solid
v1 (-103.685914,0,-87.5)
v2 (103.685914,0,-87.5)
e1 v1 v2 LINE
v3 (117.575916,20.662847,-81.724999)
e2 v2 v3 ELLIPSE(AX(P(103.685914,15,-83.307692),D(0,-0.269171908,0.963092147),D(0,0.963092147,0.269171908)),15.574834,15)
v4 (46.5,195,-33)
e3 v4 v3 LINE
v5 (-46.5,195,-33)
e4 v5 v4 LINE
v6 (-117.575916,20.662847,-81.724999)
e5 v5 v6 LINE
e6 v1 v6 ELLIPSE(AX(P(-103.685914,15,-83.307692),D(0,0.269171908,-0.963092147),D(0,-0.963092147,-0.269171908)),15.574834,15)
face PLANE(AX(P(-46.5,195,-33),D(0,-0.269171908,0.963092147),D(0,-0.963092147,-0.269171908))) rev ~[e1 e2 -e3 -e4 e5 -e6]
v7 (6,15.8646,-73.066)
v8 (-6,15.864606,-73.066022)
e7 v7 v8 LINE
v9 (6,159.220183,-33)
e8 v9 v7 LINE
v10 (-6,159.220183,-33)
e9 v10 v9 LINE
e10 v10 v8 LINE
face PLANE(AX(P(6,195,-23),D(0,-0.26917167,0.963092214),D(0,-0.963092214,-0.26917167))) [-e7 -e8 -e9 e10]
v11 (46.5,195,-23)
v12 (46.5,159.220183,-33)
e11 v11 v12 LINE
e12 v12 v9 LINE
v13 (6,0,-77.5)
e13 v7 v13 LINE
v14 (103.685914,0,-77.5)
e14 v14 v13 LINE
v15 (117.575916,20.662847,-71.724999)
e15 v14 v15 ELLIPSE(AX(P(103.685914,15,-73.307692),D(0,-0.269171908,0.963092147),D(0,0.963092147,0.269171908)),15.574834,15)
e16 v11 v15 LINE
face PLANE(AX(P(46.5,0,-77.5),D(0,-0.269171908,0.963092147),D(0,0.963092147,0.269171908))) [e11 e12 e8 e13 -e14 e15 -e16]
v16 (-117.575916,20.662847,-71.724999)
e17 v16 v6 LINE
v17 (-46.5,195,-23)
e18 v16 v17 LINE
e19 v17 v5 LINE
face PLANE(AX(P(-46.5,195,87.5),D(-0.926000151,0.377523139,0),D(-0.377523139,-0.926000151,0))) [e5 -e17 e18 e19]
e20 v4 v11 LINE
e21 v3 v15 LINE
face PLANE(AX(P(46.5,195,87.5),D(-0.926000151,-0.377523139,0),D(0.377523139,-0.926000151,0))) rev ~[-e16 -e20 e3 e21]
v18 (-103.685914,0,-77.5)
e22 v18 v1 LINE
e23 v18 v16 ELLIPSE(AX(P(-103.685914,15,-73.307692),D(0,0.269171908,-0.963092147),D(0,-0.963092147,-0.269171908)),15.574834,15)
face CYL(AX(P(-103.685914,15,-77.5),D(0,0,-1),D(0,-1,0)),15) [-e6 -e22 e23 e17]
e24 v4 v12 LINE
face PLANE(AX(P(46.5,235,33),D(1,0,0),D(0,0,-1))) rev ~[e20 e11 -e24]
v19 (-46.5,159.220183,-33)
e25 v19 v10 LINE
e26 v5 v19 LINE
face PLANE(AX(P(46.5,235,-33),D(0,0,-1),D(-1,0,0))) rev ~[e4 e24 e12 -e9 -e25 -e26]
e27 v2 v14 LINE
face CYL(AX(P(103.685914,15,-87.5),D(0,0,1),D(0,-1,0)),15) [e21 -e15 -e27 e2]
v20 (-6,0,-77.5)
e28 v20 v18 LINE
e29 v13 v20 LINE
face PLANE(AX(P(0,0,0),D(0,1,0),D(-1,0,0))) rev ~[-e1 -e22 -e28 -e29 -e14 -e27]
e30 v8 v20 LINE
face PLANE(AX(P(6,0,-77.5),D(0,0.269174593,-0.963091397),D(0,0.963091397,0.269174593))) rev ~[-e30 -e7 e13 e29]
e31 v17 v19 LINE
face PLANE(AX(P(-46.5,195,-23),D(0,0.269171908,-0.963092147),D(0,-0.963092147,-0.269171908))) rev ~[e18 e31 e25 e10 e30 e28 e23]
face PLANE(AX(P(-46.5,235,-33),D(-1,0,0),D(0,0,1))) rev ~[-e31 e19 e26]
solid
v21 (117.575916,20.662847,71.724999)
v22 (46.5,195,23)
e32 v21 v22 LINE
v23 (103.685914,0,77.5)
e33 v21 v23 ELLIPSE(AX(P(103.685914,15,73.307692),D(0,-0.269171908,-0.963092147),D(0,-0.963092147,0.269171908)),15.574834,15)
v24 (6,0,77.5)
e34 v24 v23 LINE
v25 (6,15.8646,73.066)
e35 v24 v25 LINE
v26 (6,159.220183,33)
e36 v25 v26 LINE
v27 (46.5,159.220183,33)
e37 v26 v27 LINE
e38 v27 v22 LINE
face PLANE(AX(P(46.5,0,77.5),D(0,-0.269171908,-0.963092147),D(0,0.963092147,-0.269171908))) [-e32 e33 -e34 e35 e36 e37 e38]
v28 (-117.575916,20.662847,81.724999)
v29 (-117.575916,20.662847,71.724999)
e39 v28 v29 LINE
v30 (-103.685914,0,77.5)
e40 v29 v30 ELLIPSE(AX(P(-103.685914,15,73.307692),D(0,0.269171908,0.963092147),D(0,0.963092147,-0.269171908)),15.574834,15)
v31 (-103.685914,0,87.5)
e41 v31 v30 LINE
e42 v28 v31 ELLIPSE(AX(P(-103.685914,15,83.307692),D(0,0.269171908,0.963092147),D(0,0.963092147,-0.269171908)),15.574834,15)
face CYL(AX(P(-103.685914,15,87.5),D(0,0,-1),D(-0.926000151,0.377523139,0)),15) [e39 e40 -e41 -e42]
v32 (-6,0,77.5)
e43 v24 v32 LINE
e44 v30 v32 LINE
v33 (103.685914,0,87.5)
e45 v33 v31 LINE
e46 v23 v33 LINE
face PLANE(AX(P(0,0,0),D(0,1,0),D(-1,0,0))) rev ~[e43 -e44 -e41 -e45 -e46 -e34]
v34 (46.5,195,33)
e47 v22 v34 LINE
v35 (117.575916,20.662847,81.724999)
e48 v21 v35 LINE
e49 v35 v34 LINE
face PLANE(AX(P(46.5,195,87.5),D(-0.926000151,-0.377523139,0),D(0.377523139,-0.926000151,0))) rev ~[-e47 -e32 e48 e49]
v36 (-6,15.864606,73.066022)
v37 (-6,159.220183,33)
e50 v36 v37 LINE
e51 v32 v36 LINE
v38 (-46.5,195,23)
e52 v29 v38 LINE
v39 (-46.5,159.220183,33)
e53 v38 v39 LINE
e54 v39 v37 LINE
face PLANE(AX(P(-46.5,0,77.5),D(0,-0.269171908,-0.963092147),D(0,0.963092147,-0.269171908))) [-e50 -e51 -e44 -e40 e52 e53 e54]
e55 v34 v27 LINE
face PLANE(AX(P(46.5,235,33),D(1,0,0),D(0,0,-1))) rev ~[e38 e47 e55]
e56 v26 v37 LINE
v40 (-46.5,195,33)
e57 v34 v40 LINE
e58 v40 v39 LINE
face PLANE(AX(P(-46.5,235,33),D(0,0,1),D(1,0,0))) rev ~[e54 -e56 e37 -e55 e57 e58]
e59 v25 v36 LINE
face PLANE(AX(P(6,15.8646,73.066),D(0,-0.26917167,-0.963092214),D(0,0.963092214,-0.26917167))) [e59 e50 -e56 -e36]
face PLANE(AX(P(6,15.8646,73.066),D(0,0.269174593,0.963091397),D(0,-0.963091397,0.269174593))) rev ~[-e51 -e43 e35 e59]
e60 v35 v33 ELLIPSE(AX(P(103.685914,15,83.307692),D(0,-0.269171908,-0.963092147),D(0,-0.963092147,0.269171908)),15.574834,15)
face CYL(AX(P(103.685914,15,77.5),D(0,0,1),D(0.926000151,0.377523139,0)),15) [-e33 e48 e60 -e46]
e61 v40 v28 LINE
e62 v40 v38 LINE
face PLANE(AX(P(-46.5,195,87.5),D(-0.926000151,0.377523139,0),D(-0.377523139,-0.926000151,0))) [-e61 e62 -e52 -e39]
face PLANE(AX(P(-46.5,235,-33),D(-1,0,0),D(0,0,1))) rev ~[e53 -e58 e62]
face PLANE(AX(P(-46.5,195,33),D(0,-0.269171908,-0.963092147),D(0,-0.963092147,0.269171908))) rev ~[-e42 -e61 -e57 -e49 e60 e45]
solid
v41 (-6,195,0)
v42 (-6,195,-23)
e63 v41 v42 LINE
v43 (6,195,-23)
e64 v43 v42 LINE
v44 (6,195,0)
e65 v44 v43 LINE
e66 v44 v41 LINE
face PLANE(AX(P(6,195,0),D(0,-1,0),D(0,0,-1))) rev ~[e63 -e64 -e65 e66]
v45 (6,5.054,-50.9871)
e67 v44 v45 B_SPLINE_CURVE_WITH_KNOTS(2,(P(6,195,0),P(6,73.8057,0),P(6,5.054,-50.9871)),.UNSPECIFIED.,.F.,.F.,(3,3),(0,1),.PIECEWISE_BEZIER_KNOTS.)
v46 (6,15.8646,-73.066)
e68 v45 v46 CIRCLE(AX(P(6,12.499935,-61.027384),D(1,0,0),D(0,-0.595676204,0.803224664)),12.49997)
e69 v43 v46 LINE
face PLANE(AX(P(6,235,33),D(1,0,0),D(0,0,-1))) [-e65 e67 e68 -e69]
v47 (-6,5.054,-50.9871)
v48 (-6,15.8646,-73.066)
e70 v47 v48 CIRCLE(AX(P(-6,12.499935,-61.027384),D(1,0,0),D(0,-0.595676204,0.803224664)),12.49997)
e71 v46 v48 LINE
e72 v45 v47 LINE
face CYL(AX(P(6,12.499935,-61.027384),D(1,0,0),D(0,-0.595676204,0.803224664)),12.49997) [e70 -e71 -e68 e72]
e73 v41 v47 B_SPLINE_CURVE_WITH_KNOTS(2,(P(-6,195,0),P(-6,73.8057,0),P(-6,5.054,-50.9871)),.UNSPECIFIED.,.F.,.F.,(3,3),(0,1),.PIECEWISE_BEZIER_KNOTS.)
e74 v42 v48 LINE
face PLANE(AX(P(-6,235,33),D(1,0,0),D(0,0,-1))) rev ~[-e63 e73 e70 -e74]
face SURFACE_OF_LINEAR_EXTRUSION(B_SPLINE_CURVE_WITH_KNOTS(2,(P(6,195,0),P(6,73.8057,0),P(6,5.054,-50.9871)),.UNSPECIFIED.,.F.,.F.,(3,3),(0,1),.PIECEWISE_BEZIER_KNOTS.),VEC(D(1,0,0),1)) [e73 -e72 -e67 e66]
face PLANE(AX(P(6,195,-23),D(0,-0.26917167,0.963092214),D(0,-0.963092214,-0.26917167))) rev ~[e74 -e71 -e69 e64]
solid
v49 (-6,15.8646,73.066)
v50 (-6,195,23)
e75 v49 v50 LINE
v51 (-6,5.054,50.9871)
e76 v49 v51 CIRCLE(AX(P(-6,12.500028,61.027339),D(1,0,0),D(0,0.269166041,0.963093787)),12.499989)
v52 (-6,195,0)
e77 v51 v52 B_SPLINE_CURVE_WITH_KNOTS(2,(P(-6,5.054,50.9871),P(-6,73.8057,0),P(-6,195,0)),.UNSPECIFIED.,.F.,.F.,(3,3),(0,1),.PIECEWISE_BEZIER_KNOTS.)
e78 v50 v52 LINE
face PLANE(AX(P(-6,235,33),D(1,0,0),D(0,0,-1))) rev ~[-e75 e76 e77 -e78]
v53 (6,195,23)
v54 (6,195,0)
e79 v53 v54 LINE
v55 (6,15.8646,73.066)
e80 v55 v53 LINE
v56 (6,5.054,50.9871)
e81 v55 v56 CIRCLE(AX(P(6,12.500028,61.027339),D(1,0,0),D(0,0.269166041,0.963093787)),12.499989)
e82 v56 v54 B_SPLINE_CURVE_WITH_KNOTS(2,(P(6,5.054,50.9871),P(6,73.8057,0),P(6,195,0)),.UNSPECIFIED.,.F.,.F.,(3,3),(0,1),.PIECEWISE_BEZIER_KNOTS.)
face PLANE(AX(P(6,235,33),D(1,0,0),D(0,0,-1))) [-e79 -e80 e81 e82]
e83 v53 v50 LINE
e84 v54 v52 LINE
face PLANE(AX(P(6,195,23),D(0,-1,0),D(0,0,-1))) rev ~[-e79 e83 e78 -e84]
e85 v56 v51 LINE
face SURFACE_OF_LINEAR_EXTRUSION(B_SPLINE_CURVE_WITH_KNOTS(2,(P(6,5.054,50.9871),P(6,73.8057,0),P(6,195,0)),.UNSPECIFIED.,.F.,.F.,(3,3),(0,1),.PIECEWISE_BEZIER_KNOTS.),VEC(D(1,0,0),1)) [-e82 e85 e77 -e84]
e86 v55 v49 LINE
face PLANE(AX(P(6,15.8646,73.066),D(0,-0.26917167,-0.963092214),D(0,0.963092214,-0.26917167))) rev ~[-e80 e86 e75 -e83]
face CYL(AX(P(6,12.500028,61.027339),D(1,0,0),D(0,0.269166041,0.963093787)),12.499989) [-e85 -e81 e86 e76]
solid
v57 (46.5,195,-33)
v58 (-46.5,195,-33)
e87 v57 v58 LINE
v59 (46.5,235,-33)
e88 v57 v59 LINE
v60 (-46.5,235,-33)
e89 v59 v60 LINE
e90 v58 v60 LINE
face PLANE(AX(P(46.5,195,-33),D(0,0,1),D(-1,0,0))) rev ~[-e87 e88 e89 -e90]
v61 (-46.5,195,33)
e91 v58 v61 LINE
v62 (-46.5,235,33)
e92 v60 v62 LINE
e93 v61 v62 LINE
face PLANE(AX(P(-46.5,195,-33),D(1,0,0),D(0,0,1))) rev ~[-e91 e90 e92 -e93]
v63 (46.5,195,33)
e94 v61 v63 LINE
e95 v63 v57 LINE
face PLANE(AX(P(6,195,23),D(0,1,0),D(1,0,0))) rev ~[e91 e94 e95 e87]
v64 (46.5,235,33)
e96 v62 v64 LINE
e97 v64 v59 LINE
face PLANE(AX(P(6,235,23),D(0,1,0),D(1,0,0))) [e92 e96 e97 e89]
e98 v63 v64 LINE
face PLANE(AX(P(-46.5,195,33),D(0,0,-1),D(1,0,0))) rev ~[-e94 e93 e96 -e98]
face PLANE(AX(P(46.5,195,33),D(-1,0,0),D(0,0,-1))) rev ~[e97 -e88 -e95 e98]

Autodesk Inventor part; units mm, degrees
ref_plane "YZ Plane" through (0, 0, 0) normal (1, 0, 0) x (0, 1, 0)
ref_plane "XZ Plane" through (0, 0, 0) normal (0, 1, 0) x (-1, 0, 0)
ref_plane "XY Plane" through (0, 0, 0) normal (0, 0, 1) x (1, 0, 0)
sketch "Sketch1" plane through (0, 0, 0) normal (0, 1, 0) x (-1, 0, 0)
  line L0 (126, -87.5) -> (-126, -87.5)
  line L1 (-126, -87.5) -> (-126, 87.5)
  line L2 (-126, 87.5) -> (126, 87.5)
  line L3 (126, 87.5) -> (126, -87.5)
  line L4 (0, -87.5) -> (0, 87.5) construction
  line L5 (126, 0) -> (-126, 0) construction
  point P0 (0, 0)
  point P1 (0, 0)
  dimension "d0" = 252
  dimension "d1" = 175
extrude "Extrusion1" add sketch "Sketch1" along normal blind 235
sketch "Sketch3" plane through (0, 235, 0) normal (0, 1, 0) x (1, 0, 0)
  line L0 (126, 87.5) -> (-126, 87.5) projected
  line L1 (-126, 87.5) -> (-126, -87.5) projected
  line L2 (-126, -87.5) -> (126, -87.5) projected
  line L3 (126, -87.5) -> (126, 87.5) projected
  line L4 (-46.5, 33) -> (46.5, 33)
  line L5 (46.5, 33) -> (46.5, -33)
  line L6 (46.5, -33) -> (-46.5, -33)
  line L7 (-46.5, -33) -> (-46.5, 33)
  line L8 (0, 33) -> (0, -33) construction
  line L9 (-46.5, 0) -> (46.5, 0) construction
  point P0 (0, 0)
  point P1 (0, 0)
  dimension "d6" = 93
  dimension "d7" = 66
extrude "Extrusion2" cut sketch "Sketch3" against normal blind 40
sketch "Sketch4" plane through (-126, 0, 87.5) normal (0, 0, 1) x (1, 0, 0)
  line L0 (79.5, 235) -> (79.5, 195) construction
  line L1 (172.5, 235) -> (172.5, 195) construction
  line L2 (252, 0) -> (0, 0) projected
  line L3 (79.5, 195) -> (0, 0)
  line L4 (172.5, 195) -> (252, 0)
  line L5 (0, 0) -> (0, 195) projected
  line L6 (252, 195) -> (0, 195) projected
  line L7 (252, 0) -> (252, 195) projected
  point P0 (126, 0)
extrude "Extrusion3" cut sketch "Sketch4" against normal up to next contours L4 L6 L7 | L5 L6 L3
sketch "Sketch5" plane through (-46.5, 235, -33) normal (-1, 0, 0) x (0, 0, 1)
  line L0 (66, 0) -> (66, -40) projected
  line L1 (120.5, -235) -> (120.5, -40) projected
  line L2 (66, -40) -> (120.5, -235)
  line L3 (120.5, -235) -> (120.5, -40)
  line L4 (120.5, -40) -> (66, -40) projected
  line L5 (120.5, -40) -> (66, -40)
  line L6 (0, -40) -> (-54.5, -40) projected
  line L7 (0, -40) -> (-54.5, -235)
  line L8 (-54.5, -235) -> (-54.5, -40)
  point P0 (33, -235)
extrude "Extrusion4" cut sketch "Sketch5" along normal up to next
sketch "Sketch6" plane through (-46.5, 235, -33) normal (-1, 0, 0) x (0, 0, 1)
  line L0 (-54.5, -40) -> (0, -40) projected
  line L1 (-54.5, -235) -> (-54.5, -40) projected
  line L2 (-54.5, -235) -> (0, -40) projected
  line L3 (66, -40) -> (120.5, -235) projected
  line L4 (120.5, -40) -> (120.5, -235) projected
  line L5 (66, -40) -> (120.5, -40) projected
  point P0 (33, -235)
extrude "Extrusion5" cut sketch "Sketch6" against normal up to next
sketch "Sketch7" plane through (-46.5, 235, -33) normal (-1, 0, 0) x (0, 0, 1)
  line L0 (66, -40) -> (0, -40) projected
  line L1 (0, -40) -> (10, -40)
  line L2 (0, -40) -> (-54.5, -235) projected
  line L3 (120.5, -235) -> (-54.5, -235) projected
  line L4 (-54.5, -235) -> (-44.5, -235)
  line L5 (-44.5, -235) -> (10, -40)
  line L6 (66, -40) -> (56, -40)
  line L7 (120.5, -235) -> (110.5, -235)
  line L8 (110.5, -235) -> (56, -40)
  line L9 (120.5, -235) -> (66, -40) projected
  point P0 (33, -235)
  dimension "d16" = 10
  dimension "d17" = 10
  dimension "d18" = 10
  dimension "d19" = 10
extrude "Extrusion6" cut sketch "Sketch7" along normal up to next contours L8 L3 L5 L0
sketch "Sketch8" plane through (-46.5, 235, -33) normal (-1, 0, 0) x (0, 0, 1)
  line L0 (110.5, -235) -> (56, -40) projected
  line L1 (10, -40) -> (-44.5, -235) projected
  line L2 (56, -40) -> (10, -40)
  line L3 (110.5, -235) -> (-44.5, -235) projected
  point P0 (33, -235)
extrude "Extrusion7" cut sketch "Sketch8" against normal blind 40.5
sketch "Sketch9" plane through (46.5, 235, 33) normal (1, 0, 0) x (0, 0, -1)
  line L0 (10, -40) -> (-44.5, -235) projected
  line L1 (56, -40) -> (10, -40) projected
  line L2 (110.5, -235) -> (56, -40) projected
  line L3 (-44.5, -235) -> (110.5, -235) projected
  point P0 (33, -235)
extrude "Extrusion8" cut sketch "Sketch9" along normal up to next
sketch "Sketch10" plane through (46.5, 235, 33) normal (1, 0, 0) x (0, 0, -1)
  line L0 (0, -40) -> (10, -40) projected
  line L1 (56, -40) -> (10, -40) projected
  line L2 (10, -40) -> (56, -40)
  line L3 (-44.5, -235) -> (10, -40) projected
  line L4 (110.5, -235) -> (-44.5, -235) projected
  line L5 (56, -40) -> (110.5, -235) projected
  point P0 (33, -235)
extrude "Extrusion9" cut sketch "Sketch10" against normal blind 40.5
sketch "Sketch11" plane through (6, 235, 33) normal (1, 0, 0) x (0, 0, -1)
  line L0 (10, -40) -> (56, -40) construction
  line L1 (33, -40) -> (33, -235) construction
  arc A0 (-40.066, -219.1354) -> (-17.9871, -229.946) centre (-28.0274, -222.5) ccw
  line L2 (110.5, -235) -> (-44.5, -235) construction
  line L3 (-44.5, -235) -> (10, -40) construction
  line L4 (-17.9871, -229.946) -> (33, -161.1943) construction
  line L5 (33, -161.1943) -> (33, -40) construction
  spline S0 degree 2 poles (-17.9871, -229.946) (33, -161.1943) (33, -40) knots 1 1 1 2 2 2
  line L6 (-40.066, -219.1354) -> (-44.5, -235)
  line L7 (-28.0274, -235) -> (33, -235)
  line L8 (33, -235) -> (33, -40)
  line L9 (-28.0274, -235) -> (-44.5, -235)
  arc A1 (83.9871, -229.946) -> (106.066, -219.1354) centre (94.0274, -222.5) ccw
  line L10 (83.9871, -229.946) -> (33, -161.1943) construction
  line L11 (33, -161.1943) -> (33, -40) construction
  spline S1 degree 2 poles (83.9871, -229.946) (33, -161.1943) (33, -40) knots 1 1 1 2 2 2
  line L12 (33, -235) -> (94.0274, -235)
  line L13 (110.5, -235) -> (106.066, -219.1354)
  line L14 (56, -40) -> (110.5, -235) projected
  line L15 (94.0274, -235) -> (110.5, -235)
  dimension "d28" = 25
extrude "Extrusion10" cut sketch "Sketch11" against normal up to next
fillet "Fillet1" radius 15 4 edges at (-126, 0, -82.5) (-126, 0, 82.5) (126, 0, 82.5) (126, 0, -82.5)
sketch "Sketch12" plane through (6, 235, 33) normal (1, 0, 0) x (0, 0, -1)
  arc A0 (-40.066, -219.1354) -> (-17.9871, -229.946) centre (-28.0274, -222.5) ccw projected
  spline S0 degree 2 poles (-17.9871, -229.946) (33, -161.1943) (33, -40) knots 0 0 0 1 1 1 projected
  line L0 (10, -40) -> (33, -40) projected
  line L1 (-40.066, -219.1354) -> (10, -40) projected
  arc A1 (83.9871, -229.946) -> (106.066, -219.1354) centre (94.0274, -222.5) ccw projected
  line L2 (56, -40) -> (106.066, -219.1354) projected
  line L3 (33, -40) -> (56, -40) projected
  spline S1 degree 2 poles (33, -40) (33, -161.1943) (83.9871, -229.946) knots 0 0 0 1 1 1 projected
  point P0 (33, -235)
extrude "Extrusion11" add sketch "Sketch12" against normal blind 12 separate body
sketch "Sketch13" plane through (6, 235, 33) normal (1, 0, 0) x (0, 0, -1)
  arc A0 (-40.066, -219.1354) -> (-17.9871, -229.946) centre (-28.0274, -222.5) ccw projected
  spline S0 degree 2 poles (-17.9871, -229.946) (33, -161.1943) (33, -40) knots 0 0 0 1 1 1 projected
  line L0 (10, -40) -> (33, -40) projected
  line L1 (-40.066, -219.1354) -> (10, -40) projected
  arc A1 (83.9871, -229.946) -> (106.066, -219.1354) centre (94.0274, -222.5) ccw projected
  line L2 (56, -40) -> (106.066, -219.1354) projected
  line L3 (33, -40) -> (56, -40) projected
  spline S1 degree 2 poles (33, -40) (33, -161.1943) (83.9871, -229.946) knots 0 0 0 1 1 1 projected
  point P0 (33, -235)
extrude "Extrusion12" cut sketch "Sketch13" against normal up to next bodies 1
sketch "Sketch14" plane through (0, 235, 0) normal (0, 1, 0) x (1, 0, 0)
  line L0 (-46.5, 33) -> (-46.5, -33) projected
  line L1 (-46.5, -33) -> (46.5, -33) projected
  line L2 (46.5, -33) -> (46.5, 33) projected
  line L3 (46.5, 33) -> (-46.5, 33) projected
  point P0 (0, 0)
extrude "Extrusion13" cut sketch "Sketch14" against normal up to next bodies 1
sketch "Sketch15" plane through (6, 195, 23) normal (0, 1, 0) x (1, 0, 0)
  line L0 (-52.5, -10) -> (40.5, -10) projected
  line L1 (-52.5, -10) -> (40.5, -10)
  line L2 (40.5, -10) -> (40.5, 56)
  line L3 (40.5, 56) -> (-52.5, 56)
  line L4 (-52.5, 56) -> (-52.5, -10)
  point P0 (-6, 23)
extrude "Extrusion14" add sketch "Sketch15" along normal blind 40 separate body
properties part number "ANTENNA"
